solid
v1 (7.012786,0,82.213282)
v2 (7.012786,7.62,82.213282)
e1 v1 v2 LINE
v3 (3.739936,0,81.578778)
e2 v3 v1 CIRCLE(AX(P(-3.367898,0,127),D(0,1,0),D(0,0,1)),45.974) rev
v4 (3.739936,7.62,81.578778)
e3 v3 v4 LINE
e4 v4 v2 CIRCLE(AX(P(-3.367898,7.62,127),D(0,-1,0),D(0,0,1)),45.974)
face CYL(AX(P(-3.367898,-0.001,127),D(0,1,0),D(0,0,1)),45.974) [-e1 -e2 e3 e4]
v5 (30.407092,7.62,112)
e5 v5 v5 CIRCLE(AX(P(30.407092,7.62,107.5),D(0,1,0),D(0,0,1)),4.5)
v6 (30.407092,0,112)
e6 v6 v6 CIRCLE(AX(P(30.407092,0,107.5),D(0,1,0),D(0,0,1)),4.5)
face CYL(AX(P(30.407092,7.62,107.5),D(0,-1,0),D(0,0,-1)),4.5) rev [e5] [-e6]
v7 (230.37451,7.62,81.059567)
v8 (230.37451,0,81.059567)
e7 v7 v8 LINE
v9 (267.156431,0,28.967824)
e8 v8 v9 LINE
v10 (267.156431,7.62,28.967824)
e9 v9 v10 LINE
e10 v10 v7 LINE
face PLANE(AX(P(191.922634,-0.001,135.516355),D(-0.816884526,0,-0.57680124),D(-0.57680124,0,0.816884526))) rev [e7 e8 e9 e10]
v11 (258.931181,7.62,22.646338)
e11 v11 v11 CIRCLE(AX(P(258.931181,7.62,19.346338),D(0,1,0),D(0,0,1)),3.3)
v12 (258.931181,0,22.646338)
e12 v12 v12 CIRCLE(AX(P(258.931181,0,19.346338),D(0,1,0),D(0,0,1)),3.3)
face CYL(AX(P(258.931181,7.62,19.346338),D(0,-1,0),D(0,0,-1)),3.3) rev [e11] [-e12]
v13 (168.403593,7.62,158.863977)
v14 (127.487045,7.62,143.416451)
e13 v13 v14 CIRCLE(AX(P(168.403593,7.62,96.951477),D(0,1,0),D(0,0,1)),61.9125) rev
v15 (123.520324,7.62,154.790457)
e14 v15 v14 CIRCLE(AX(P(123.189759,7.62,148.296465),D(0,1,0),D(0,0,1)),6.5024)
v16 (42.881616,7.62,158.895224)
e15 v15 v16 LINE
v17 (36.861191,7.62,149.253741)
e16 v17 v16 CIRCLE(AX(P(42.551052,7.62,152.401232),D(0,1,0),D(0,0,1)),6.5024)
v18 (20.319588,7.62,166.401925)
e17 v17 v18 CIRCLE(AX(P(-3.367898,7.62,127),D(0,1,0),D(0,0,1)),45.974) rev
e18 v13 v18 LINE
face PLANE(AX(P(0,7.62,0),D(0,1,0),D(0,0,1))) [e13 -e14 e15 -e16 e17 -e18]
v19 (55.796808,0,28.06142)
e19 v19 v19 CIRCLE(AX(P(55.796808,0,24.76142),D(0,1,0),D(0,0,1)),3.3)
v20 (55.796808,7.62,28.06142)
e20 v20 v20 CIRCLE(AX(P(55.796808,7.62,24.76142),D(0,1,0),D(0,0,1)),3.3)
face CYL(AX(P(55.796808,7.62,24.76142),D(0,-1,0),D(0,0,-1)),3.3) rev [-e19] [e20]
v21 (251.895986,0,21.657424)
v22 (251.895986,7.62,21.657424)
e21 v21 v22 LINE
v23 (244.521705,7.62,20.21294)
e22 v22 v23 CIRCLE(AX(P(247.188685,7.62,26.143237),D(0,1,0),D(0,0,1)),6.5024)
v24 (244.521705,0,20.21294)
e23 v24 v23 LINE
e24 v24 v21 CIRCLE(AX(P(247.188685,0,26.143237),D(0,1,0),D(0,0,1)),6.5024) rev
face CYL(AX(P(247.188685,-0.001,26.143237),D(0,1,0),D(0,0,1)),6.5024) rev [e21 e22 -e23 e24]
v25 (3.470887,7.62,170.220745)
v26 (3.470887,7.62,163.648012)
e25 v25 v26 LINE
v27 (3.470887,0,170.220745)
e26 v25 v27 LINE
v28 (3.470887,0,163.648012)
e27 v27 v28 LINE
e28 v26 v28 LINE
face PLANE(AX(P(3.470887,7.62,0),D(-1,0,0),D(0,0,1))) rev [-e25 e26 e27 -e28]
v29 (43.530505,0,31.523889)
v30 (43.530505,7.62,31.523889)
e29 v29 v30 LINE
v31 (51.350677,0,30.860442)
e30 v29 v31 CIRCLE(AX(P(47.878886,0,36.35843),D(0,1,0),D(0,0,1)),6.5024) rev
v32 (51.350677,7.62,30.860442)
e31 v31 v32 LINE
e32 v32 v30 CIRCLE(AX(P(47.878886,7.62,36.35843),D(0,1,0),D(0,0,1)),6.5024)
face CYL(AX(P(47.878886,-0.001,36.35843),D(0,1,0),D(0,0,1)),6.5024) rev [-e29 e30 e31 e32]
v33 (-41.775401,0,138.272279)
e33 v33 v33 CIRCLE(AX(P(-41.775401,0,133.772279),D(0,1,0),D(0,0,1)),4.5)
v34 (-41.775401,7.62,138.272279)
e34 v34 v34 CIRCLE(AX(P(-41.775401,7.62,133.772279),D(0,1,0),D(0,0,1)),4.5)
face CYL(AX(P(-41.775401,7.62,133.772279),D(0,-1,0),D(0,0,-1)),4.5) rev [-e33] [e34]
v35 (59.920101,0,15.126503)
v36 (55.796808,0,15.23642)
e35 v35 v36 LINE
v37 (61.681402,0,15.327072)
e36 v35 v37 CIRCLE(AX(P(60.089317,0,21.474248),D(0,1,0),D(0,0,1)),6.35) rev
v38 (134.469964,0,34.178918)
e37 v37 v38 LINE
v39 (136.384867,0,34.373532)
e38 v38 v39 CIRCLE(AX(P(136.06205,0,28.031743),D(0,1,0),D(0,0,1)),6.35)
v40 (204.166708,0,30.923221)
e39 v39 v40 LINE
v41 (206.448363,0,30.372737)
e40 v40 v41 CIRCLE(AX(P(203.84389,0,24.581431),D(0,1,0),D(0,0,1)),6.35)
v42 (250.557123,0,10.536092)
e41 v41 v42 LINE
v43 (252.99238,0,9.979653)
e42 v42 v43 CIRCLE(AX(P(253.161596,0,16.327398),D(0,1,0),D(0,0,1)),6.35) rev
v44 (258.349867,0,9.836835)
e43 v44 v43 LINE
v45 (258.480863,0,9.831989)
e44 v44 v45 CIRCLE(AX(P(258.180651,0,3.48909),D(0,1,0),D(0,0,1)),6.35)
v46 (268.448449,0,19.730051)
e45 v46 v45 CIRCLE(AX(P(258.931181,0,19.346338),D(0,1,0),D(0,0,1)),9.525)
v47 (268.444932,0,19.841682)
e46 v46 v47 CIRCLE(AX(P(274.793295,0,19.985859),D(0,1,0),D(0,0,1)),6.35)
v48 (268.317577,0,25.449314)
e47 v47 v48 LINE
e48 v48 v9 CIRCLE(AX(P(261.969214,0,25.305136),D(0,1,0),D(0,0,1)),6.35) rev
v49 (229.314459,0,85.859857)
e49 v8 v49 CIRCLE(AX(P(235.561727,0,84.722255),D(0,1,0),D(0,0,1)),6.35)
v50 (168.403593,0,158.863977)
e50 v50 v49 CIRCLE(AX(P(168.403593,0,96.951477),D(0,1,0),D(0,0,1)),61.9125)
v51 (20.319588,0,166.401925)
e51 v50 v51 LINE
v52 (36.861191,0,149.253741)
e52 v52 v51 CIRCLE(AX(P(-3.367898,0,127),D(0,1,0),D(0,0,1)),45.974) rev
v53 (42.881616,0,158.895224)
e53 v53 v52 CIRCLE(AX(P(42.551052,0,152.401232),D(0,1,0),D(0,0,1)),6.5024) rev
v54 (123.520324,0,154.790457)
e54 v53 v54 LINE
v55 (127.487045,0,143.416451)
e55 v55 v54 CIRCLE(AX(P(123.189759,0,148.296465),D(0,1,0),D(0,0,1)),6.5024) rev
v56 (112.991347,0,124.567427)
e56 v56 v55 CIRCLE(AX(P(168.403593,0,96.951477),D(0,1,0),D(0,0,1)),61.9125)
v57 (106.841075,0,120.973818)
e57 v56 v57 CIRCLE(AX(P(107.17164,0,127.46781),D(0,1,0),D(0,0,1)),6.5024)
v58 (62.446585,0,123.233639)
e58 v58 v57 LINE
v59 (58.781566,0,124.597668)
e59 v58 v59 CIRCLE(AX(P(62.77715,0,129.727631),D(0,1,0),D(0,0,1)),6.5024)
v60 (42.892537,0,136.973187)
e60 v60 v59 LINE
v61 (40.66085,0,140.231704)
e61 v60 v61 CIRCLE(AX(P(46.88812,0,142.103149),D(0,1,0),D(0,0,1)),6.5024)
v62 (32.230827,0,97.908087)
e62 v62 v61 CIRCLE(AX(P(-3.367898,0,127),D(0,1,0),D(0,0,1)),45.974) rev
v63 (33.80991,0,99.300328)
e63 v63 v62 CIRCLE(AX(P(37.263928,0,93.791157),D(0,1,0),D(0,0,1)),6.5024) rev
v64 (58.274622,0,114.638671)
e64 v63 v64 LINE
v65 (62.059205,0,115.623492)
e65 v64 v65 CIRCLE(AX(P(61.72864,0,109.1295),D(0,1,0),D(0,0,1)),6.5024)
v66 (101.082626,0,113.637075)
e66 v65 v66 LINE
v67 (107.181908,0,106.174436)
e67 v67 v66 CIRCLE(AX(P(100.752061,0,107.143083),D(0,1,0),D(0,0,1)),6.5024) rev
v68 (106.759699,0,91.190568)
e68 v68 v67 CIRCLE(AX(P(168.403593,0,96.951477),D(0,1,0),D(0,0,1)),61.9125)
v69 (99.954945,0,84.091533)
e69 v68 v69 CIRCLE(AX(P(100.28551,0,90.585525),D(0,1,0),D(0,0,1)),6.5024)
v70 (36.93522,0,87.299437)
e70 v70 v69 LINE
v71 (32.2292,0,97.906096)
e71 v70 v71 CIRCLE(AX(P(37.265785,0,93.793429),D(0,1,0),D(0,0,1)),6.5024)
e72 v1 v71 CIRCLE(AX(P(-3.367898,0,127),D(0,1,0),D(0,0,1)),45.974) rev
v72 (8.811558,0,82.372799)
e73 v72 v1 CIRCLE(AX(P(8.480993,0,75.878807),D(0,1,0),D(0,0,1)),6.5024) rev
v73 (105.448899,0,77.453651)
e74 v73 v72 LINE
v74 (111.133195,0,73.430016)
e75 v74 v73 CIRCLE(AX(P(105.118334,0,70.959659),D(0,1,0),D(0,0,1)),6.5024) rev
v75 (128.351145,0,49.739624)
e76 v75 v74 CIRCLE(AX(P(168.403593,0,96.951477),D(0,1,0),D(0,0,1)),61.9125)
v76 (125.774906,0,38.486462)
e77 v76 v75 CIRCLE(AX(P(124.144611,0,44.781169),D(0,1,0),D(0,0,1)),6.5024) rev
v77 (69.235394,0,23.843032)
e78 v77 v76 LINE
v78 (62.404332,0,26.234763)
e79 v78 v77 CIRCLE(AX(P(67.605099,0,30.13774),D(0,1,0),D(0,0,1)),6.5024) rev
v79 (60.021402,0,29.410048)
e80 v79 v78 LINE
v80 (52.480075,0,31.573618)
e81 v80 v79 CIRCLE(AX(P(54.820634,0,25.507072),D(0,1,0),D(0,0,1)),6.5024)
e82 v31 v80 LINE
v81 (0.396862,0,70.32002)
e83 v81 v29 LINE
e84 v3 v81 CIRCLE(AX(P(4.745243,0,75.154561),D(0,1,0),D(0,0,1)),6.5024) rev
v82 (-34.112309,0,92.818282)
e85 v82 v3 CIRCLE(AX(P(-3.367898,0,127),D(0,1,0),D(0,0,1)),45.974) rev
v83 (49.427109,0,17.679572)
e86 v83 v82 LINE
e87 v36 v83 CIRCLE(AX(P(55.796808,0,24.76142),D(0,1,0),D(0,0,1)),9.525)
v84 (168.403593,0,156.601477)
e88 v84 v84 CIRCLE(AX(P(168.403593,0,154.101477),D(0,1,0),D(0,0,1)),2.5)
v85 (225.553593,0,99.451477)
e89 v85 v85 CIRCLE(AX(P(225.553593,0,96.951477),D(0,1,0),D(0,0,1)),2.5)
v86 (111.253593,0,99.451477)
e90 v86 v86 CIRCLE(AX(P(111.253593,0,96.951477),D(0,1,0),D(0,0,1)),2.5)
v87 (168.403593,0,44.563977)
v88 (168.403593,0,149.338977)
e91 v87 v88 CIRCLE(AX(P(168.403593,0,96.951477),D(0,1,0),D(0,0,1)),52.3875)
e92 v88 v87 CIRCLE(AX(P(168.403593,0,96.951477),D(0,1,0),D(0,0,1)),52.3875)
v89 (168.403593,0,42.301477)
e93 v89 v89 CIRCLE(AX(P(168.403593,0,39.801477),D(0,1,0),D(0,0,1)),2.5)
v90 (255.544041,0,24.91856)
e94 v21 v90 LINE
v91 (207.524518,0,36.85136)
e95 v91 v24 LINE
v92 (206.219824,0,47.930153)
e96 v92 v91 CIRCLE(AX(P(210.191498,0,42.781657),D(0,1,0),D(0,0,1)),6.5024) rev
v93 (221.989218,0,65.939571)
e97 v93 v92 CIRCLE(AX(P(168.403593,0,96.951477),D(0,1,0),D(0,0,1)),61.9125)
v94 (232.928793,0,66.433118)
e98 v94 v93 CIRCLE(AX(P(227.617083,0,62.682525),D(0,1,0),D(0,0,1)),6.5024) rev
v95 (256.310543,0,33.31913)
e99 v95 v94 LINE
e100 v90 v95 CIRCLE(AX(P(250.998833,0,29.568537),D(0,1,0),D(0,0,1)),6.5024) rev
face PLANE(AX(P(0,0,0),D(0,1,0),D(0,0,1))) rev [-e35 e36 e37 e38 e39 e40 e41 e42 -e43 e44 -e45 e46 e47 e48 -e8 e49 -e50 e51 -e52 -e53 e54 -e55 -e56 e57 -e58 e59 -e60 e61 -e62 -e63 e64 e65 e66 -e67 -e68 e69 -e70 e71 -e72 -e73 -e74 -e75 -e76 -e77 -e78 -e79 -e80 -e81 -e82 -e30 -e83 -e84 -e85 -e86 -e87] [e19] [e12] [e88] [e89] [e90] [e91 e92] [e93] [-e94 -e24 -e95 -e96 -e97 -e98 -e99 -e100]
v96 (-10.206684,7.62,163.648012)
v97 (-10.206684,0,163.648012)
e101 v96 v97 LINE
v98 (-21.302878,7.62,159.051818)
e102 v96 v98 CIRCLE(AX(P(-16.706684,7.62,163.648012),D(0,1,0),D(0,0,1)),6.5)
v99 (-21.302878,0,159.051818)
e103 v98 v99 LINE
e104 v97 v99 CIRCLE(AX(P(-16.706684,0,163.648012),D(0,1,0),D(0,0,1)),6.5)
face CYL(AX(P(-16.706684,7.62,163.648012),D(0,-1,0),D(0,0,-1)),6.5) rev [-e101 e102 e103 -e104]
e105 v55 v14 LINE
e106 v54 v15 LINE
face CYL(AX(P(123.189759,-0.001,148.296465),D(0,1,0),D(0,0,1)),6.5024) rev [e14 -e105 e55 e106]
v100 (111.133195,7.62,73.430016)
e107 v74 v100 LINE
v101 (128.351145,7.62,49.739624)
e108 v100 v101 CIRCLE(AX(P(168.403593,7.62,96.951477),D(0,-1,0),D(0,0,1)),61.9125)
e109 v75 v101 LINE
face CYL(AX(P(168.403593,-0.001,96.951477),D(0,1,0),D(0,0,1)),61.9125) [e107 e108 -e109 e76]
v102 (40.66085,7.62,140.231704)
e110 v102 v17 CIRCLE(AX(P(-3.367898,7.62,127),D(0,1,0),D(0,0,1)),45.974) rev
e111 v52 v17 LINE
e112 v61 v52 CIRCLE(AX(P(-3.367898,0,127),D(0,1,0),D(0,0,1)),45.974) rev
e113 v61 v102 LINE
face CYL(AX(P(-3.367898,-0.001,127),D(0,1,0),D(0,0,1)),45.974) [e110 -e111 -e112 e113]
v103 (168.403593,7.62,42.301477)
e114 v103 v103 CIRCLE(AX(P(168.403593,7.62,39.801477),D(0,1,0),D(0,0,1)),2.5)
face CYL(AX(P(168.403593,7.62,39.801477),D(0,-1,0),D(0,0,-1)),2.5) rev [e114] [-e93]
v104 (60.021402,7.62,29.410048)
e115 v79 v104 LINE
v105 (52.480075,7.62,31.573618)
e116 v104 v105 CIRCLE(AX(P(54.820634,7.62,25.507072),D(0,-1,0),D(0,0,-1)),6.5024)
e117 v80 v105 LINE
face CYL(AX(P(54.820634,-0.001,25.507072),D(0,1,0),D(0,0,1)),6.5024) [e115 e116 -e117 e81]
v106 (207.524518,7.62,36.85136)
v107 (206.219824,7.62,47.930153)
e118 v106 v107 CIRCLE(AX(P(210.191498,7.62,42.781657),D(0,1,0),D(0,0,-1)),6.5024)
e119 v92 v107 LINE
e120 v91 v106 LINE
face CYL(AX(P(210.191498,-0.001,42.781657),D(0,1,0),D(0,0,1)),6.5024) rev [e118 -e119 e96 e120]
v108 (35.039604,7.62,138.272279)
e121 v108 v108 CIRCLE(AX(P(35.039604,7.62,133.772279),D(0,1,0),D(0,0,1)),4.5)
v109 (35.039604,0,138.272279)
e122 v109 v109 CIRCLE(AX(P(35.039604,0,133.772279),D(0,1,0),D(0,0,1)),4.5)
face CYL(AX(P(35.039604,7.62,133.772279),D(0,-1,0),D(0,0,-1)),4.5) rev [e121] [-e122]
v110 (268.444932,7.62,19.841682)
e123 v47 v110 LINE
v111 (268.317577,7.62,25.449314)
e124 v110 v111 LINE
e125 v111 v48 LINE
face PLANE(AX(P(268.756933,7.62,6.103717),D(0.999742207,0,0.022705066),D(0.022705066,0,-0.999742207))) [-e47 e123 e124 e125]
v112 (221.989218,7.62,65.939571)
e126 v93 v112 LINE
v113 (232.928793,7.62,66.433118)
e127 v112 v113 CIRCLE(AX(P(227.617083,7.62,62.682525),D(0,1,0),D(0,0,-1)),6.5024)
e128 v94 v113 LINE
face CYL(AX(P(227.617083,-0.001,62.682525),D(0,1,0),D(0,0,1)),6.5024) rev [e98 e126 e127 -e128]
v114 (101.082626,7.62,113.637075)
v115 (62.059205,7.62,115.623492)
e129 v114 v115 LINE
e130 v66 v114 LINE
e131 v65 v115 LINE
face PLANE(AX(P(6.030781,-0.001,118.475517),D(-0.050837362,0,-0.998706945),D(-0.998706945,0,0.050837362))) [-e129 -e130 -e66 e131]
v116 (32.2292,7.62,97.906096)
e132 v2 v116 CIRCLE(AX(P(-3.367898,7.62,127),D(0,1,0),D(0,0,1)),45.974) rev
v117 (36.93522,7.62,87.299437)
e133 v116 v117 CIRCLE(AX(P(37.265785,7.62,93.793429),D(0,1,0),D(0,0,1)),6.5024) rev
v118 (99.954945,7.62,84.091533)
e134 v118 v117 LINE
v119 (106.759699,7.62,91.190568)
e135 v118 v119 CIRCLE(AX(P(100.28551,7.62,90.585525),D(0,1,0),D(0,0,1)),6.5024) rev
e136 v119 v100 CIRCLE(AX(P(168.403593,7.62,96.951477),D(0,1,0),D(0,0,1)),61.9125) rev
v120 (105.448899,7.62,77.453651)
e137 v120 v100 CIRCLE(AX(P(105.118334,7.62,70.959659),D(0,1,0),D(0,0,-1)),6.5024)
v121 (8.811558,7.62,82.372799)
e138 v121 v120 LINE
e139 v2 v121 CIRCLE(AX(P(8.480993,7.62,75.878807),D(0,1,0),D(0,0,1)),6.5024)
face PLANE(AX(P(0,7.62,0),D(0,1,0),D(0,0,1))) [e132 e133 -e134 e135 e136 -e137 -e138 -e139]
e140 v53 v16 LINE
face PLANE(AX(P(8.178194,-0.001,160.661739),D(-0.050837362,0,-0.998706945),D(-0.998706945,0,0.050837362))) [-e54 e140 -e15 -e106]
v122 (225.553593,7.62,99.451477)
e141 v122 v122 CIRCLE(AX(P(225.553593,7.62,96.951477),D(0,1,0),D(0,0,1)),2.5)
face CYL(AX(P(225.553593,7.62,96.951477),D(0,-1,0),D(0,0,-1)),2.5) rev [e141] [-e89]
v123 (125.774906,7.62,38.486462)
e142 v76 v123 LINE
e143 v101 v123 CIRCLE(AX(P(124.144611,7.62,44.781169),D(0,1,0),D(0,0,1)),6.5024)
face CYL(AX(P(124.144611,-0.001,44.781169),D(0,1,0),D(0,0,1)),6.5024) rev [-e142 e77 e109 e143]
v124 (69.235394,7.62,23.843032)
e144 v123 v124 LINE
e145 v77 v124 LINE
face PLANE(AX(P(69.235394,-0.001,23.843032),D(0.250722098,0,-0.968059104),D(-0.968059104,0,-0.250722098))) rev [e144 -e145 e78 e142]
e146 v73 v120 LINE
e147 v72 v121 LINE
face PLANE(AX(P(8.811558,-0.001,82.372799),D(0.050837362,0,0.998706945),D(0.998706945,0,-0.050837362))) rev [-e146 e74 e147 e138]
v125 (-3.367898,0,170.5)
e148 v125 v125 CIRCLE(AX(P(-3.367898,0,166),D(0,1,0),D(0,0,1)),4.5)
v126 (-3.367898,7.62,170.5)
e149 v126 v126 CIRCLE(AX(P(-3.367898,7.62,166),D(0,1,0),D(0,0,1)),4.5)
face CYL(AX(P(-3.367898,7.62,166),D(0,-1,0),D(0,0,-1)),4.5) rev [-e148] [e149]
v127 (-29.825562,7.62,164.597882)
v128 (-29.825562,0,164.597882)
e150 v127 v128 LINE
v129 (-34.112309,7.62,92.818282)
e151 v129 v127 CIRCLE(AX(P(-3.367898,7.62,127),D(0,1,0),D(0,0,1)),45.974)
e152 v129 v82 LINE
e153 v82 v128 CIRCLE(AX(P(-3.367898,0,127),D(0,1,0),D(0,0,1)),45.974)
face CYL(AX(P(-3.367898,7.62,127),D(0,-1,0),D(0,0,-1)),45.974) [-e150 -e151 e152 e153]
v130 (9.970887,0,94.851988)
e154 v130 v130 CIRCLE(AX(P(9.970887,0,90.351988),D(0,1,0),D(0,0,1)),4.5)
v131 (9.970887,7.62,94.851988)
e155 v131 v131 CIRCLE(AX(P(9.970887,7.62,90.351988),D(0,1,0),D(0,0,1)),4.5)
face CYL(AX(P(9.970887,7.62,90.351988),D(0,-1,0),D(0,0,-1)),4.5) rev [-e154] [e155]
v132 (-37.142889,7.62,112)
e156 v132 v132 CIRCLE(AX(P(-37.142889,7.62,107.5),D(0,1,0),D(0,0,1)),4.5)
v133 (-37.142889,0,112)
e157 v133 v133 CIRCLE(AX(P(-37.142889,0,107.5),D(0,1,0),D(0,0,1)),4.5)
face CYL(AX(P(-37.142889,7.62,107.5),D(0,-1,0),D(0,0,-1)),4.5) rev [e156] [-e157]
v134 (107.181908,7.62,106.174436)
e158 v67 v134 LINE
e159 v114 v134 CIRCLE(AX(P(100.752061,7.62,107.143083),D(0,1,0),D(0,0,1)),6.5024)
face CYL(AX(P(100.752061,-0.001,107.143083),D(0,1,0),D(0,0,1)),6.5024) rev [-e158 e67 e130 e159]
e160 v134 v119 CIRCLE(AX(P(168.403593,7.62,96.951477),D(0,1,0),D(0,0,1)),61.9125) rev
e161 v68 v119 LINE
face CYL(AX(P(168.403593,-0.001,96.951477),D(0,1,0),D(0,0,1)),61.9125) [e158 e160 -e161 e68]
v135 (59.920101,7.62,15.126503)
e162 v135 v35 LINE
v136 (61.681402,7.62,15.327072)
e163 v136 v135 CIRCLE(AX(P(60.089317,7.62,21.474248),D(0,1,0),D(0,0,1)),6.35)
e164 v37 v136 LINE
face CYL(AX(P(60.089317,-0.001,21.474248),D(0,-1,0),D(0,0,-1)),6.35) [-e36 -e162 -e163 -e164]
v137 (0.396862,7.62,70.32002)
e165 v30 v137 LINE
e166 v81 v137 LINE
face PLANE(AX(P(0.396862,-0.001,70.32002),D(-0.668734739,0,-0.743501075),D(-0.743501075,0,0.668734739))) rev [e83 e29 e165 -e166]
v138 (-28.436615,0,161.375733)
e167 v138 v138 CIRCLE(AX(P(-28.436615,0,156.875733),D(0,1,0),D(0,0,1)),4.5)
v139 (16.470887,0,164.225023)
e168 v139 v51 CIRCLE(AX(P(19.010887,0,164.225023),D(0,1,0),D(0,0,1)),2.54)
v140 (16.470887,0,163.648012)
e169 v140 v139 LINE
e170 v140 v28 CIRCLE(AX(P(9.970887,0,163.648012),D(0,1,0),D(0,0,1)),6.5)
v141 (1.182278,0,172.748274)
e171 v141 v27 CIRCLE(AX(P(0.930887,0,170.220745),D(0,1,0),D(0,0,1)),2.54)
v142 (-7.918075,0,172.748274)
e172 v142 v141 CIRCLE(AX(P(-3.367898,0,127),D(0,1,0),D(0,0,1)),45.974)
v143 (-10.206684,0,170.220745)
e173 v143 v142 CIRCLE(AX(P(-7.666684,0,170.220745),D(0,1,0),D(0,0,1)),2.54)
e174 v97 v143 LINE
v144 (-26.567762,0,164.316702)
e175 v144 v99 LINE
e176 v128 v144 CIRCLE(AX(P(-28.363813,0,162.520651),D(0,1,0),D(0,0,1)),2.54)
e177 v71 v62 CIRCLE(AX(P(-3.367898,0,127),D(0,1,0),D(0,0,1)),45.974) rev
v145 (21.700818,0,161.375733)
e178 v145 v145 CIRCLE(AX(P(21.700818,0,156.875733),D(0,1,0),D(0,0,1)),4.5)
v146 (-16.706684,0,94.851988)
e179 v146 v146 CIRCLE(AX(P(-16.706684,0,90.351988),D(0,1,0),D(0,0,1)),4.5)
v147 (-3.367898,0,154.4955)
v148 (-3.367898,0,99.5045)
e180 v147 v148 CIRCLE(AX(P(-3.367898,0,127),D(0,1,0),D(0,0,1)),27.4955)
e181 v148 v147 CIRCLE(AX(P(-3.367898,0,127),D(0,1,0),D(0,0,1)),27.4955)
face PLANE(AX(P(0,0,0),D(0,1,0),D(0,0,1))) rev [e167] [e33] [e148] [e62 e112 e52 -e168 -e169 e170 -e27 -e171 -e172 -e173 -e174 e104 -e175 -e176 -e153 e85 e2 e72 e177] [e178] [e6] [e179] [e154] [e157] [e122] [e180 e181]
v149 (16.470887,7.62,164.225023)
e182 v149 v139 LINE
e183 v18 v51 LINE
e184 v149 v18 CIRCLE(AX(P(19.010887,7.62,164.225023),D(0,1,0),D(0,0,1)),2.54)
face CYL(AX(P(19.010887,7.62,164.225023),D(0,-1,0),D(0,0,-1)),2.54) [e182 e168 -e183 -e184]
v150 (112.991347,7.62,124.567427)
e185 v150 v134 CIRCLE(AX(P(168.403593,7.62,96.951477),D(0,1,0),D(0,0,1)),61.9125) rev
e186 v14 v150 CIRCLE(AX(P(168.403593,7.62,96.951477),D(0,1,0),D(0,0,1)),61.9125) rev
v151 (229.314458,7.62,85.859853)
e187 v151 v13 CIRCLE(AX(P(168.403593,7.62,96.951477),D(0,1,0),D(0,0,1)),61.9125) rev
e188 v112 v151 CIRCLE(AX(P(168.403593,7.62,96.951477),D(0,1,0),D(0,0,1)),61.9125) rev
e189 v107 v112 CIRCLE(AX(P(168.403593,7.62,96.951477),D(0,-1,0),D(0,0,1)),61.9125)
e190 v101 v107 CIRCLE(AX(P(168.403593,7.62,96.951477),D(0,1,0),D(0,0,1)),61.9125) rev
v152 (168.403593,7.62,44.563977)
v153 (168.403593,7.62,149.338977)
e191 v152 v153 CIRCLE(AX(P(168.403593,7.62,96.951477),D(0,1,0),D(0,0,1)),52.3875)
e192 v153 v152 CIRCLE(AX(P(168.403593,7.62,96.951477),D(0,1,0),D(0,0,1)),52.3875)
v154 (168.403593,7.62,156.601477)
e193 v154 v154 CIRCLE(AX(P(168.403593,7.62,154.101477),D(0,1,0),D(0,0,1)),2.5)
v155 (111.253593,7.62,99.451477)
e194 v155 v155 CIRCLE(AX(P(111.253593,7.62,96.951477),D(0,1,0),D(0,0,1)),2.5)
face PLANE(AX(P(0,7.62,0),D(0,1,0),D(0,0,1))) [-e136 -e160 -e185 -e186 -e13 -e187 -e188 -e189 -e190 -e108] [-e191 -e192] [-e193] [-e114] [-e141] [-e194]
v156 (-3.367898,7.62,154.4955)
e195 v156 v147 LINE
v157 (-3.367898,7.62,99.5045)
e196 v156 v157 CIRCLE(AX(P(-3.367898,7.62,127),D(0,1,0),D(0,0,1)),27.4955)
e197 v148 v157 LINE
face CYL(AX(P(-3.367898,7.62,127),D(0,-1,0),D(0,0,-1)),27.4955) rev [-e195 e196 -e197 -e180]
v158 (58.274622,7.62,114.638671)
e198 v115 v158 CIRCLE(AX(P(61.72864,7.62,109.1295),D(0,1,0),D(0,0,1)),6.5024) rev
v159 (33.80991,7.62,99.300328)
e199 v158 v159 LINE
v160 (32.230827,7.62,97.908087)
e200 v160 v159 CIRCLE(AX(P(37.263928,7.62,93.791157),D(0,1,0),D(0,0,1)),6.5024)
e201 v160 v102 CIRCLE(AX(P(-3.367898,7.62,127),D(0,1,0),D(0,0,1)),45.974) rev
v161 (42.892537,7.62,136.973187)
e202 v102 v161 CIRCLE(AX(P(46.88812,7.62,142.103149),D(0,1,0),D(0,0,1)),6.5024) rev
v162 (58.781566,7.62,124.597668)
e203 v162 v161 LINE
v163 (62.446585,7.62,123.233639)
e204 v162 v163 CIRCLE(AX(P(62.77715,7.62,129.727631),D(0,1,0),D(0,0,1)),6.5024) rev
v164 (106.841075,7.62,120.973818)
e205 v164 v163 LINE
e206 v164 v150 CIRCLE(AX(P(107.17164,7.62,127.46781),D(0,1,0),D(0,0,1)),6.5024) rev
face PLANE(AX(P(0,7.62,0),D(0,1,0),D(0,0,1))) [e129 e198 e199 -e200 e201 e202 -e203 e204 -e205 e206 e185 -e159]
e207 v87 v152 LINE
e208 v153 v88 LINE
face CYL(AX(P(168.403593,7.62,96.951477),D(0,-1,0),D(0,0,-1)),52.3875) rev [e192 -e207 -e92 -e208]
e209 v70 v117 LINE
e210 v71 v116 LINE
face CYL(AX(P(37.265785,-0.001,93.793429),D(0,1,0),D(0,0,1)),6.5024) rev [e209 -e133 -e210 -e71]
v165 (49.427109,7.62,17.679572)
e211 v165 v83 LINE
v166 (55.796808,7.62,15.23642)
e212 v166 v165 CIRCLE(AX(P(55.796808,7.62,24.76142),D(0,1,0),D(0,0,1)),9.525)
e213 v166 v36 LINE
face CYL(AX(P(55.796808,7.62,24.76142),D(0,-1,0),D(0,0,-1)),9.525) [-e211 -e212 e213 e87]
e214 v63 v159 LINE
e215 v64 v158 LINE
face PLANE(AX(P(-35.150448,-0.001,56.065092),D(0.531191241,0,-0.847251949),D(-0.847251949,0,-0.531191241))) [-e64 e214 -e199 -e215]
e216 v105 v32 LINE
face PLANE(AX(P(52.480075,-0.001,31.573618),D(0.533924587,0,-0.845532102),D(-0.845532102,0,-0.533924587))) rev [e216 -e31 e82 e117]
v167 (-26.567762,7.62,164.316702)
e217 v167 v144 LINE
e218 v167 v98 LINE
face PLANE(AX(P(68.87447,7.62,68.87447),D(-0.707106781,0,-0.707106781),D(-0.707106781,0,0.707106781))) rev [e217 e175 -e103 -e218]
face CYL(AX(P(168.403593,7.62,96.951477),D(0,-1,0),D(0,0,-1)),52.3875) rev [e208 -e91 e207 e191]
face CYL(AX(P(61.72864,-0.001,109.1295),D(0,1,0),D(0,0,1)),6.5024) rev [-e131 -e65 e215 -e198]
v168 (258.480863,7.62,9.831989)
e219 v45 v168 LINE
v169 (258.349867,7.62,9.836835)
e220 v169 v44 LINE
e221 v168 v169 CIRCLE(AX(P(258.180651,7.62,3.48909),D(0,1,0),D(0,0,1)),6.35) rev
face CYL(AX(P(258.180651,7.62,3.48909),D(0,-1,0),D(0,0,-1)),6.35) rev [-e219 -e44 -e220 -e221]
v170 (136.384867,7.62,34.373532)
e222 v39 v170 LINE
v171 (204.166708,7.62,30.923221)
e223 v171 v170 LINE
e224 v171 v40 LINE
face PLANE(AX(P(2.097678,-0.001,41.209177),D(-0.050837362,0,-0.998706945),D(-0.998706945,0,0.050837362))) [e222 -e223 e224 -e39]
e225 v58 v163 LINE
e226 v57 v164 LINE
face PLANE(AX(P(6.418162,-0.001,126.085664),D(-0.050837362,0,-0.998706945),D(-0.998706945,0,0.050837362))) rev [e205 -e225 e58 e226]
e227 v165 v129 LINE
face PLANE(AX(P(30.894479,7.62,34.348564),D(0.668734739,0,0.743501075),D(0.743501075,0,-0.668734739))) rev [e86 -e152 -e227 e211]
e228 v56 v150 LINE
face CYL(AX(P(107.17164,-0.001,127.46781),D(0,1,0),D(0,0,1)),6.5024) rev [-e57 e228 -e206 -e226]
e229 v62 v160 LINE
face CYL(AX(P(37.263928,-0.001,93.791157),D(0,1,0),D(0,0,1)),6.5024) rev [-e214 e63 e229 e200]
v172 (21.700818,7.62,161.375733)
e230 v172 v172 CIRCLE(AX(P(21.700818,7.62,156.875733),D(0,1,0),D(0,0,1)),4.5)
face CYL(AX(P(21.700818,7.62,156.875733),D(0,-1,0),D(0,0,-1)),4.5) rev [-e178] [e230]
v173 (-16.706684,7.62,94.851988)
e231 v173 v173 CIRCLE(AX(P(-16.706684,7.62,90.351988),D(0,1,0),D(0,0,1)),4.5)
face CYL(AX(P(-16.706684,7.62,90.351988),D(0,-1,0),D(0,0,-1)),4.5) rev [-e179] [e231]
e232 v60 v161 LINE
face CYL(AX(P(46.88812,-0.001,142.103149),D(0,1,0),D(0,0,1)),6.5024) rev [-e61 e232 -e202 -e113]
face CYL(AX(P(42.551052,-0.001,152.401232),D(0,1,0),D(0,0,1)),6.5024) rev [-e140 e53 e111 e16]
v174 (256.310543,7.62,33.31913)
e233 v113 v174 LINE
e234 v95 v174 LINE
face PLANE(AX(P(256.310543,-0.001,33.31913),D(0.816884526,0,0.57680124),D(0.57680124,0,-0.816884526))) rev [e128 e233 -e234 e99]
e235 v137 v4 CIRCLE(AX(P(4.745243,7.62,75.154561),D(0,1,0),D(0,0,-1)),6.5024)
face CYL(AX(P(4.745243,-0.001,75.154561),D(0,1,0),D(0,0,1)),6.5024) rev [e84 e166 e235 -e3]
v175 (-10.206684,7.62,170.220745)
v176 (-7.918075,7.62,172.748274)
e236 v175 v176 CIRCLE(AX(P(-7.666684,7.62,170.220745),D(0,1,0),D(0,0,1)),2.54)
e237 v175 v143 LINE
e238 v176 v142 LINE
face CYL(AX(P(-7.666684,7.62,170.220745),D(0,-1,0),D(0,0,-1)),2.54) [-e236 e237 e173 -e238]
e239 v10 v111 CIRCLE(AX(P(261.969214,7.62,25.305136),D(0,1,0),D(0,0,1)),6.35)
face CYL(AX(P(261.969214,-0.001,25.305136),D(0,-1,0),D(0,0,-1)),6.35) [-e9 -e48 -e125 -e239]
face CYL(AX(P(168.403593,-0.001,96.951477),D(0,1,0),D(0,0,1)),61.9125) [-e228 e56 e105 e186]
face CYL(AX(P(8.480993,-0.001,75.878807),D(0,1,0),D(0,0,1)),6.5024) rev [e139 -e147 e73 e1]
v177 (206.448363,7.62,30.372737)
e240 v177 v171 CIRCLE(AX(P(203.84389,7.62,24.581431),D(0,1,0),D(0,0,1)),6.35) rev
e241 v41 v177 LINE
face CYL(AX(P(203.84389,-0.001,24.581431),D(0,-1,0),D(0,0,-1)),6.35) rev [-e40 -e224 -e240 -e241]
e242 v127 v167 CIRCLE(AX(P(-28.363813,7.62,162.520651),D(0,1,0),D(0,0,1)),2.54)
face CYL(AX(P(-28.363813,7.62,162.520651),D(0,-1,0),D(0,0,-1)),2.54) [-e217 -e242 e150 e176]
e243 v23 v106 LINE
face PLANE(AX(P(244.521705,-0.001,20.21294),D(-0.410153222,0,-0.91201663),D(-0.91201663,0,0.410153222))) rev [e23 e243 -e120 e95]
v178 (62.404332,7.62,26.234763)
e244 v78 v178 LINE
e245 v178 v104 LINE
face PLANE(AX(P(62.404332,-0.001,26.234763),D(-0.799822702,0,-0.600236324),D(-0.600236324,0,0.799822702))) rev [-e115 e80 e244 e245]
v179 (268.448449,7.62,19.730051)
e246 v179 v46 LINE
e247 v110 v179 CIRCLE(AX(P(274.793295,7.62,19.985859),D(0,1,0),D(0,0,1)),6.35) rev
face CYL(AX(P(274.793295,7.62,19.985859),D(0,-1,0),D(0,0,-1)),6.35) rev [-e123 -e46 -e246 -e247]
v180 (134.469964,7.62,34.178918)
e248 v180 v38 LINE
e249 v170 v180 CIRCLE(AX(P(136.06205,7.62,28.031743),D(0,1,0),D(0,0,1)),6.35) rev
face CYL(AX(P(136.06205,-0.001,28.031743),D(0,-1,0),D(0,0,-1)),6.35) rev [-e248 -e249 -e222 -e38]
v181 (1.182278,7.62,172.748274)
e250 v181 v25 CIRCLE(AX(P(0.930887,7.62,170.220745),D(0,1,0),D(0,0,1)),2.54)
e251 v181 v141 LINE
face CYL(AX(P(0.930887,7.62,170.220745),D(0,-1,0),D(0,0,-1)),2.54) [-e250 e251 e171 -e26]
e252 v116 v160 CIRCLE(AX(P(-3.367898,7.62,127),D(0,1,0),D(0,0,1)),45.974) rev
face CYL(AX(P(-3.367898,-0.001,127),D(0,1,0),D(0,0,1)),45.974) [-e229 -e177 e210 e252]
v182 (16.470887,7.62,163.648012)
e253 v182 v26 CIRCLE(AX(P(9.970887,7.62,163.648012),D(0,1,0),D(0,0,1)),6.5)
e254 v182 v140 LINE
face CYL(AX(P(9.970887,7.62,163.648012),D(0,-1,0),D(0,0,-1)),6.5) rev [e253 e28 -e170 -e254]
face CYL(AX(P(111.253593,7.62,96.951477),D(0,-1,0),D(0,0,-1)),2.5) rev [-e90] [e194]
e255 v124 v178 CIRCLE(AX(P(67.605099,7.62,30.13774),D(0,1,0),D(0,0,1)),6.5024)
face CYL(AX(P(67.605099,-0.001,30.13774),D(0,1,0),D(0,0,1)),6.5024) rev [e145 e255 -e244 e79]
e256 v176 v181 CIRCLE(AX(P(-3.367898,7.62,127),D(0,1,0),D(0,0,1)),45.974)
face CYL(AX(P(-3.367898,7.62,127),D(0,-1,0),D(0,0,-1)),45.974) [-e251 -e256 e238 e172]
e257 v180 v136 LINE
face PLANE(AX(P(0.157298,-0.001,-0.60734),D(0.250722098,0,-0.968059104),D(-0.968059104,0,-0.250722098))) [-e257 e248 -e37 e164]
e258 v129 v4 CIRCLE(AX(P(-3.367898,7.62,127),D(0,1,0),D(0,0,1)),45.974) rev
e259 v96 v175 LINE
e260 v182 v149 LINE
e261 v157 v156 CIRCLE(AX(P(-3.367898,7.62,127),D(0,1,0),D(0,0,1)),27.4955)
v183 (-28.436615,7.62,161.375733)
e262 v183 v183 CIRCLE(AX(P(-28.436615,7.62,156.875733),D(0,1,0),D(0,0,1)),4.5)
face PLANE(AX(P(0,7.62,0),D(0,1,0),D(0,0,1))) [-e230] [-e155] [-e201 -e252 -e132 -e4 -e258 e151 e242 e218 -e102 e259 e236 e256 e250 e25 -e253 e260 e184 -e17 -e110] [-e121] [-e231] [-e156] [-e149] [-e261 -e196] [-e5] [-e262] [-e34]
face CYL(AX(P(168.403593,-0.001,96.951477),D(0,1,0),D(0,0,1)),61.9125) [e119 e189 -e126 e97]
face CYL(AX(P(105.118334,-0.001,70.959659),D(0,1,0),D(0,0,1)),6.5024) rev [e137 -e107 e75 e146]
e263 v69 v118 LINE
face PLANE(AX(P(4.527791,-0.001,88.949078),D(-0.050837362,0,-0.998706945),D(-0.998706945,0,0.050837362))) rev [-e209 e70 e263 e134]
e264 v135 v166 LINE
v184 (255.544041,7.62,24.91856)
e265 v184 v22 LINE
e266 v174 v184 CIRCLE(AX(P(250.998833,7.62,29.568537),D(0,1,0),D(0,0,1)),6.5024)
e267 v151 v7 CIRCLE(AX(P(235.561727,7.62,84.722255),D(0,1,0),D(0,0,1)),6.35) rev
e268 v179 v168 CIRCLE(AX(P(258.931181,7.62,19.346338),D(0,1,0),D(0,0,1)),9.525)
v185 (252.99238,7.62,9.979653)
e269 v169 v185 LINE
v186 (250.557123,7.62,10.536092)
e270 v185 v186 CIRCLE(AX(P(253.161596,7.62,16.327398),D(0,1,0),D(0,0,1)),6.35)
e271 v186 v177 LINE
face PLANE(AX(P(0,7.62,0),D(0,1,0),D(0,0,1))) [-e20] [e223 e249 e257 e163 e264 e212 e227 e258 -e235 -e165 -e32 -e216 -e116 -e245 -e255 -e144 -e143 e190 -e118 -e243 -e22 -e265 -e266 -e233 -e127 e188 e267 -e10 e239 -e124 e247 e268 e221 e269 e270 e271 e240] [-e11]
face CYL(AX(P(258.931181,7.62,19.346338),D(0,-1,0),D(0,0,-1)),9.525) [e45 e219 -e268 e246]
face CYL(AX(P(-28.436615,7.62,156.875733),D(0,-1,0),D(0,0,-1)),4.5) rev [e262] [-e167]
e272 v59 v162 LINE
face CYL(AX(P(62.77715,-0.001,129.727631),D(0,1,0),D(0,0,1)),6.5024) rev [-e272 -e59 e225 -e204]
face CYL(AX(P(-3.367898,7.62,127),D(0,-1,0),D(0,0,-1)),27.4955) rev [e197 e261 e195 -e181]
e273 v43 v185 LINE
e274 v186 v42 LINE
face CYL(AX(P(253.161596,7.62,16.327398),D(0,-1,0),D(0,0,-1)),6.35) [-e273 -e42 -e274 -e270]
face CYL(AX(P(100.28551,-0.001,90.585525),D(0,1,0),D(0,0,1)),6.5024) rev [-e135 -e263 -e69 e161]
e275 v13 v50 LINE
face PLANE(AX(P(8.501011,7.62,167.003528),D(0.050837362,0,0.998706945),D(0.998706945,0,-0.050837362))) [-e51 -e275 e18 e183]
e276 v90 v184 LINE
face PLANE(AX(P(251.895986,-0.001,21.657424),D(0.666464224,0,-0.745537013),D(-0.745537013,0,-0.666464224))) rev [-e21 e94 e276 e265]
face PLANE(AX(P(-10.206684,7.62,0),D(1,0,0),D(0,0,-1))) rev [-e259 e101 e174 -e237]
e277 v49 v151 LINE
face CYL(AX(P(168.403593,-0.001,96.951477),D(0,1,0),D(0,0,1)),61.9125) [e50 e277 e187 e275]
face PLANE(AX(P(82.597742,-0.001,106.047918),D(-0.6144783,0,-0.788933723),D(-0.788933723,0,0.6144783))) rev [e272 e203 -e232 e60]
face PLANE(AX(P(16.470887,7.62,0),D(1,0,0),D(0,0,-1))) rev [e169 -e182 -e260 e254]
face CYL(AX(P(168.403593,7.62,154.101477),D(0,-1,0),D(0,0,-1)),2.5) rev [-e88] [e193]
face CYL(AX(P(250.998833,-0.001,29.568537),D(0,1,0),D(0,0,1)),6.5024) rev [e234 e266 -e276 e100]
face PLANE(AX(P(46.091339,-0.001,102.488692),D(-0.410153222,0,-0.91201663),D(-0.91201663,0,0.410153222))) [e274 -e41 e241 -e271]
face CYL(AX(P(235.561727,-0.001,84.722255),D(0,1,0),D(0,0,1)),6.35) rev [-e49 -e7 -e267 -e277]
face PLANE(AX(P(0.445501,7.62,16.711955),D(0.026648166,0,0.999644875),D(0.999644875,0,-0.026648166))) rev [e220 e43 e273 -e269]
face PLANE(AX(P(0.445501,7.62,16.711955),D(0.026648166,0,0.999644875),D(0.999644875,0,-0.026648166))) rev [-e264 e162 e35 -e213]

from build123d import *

# Parameters (mm, degrees)
SKETCH3_R           = 2.5
SKETCH3_R_2         = 52.3875
SKETCH3_R_3         = 3.3
SKETCH3_R_4         = 4.5
SKETCH3_R_5         = 27.4955
SKETCH3_R_6         = 3.300000004
BOSS_EXTRUDE1_DEPTH = 7.62
CUT_EXTRUDE3_REACH  = 321.448
CUT_EXTRUDE4_REACH  = 321.448
FILLET1_R           = 6.35
CUT_EXTRUDE10_REACH = 321.448
CUT_EXTRUDE12_REACH = 321.448
CUT_EXTRUDE15_START = -7.62
CUT_EXTRUDE15_DEPTH = 7.62


# Read off the part's stored shape, not the designer's step: Cut-Extrude15
with BuildPart() as part:
    # Sketch3 → Boss-Extrude1 (new body)
    with BuildSketch(Plane(origin=(0, 0, 0), x_dir=(-1, 0, 0), z_dir=(0, 1, 0))):
        with BuildLine():
            Line((-49.427109136, 17.679572239), (34.112309331, 92.818281558))
            ThreePointArc((34.112309331, 92.818281558), (49.260131818, 129.740728466), (29.825562347, 164.597881552))
            ThreePointArc((29.825562347, 164.597881552), (28.145398332, 165.051242365), (26.567761736, 164.316701751))
            Line((26.567761736, 164.316701751), (21.302878118, 159.051818133))
            ThreePointArc((21.302878118, 159.051818133), (14.21924173, 157.642795249), (10.20668404, 163.648012211))
            Line((10.20668404, 163.648012211), (10.20668404, 170.220745001))
            ThreePointArc((10.20668404, 170.220745001), (9.549518747, 171.925600851), (7.91807501, 172.748273949))
            ThreePointArc((7.91807501, 172.748273949), (3.367898451, 172.974), (-1.182278109, 172.748273949))
            ThreePointArc((-1.182278109, 172.748273949), (-2.813721846, 171.925600851), (-3.470887139, 170.220745001))
            Line((-3.470887139, 170.220745001), (-3.470887139, 163.648012211))
            ThreePointArc((-3.470887139, 163.648012211), (-9.970887139, 157.148012211), (-16.470887139, 163.648012211))
            Line((-16.470887139, 163.648012211), (-16.470887139, 164.225022653))
            ThreePointArc((-16.470887139, 164.225022653), (-17.760387302, 166.435870942), (-20.319588051, 166.401924563))
            Line((-20.319588051, 166.401924563), (-168.403592651, 158.863977372))
            Line((-168.403592651, 158.863977372), (-265.178957518, 163.648012211))
            Line((-265.178957518, 163.648012211), (-268.446360693, 19.778758396))
            ThreePointArc((-268.446360693, 19.778758396), (-265.639755471, 12.584633122), (-258.423714062, 9.834866275))
            Line((-258.423714062, 9.834866275), (-55.796807523, 15.236419982))
            ThreePointArc((-55.796807523, 15.236419982), (-52.385720802, 15.868157792), (-49.427109136, 17.679572239))
        make_face()
        with Locations(Location((-168.403592651, 39.801477371, 0), (0, 0, 90))):
            Circle(SKETCH3_R, mode=Mode.SUBTRACT)
        with Locations(Location((-225.553592651, 96.951477371, 0), (0, 0, 90))):
            Circle(SKETCH3_R, mode=Mode.SUBTRACT)
        with Locations(Location((-168.403592651, 96.951477372, 0), (0, 0, 90))):
            Circle(SKETCH3_R_2, mode=Mode.SUBTRACT)
        with Locations(Location((-111.253592651, 96.951477371, 0), (0, 0, 90))):
            Circle(SKETCH3_R, mode=Mode.SUBTRACT)
        with Locations(Location((-168.403592651, 154.101477371, 0), (0, 0, 90))):
            Circle(SKETCH3_R, mode=Mode.SUBTRACT)
        with Locations(Location((-55.796807523, 24.761419982, 0), (0, 0, 90))):
            Circle(SKETCH3_R_3, mode=Mode.SUBTRACT)
        with Locations(Location((28.436615228, 156.875733282, 0), (0, 0, 90))):
            Circle(SKETCH3_R_4, mode=Mode.SUBTRACT)
        with Locations(Location((-9.970887139, 90.351987789, 0), (0, 0, 90))):
            Circle(SKETCH3_R_4, mode=Mode.SUBTRACT)
        with Locations(Location((16.70668404, 90.351987789, 0), (0, 0, 90))):
            Circle(SKETCH3_R_4, mode=Mode.SUBTRACT)
        with Locations(Location((-30.407092297, 107.5, 0), (0, 0, 90))):
            Circle(SKETCH3_R_4, mode=Mode.SUBTRACT)
        with Locations(Location((37.142889198, 107.5, 0), (0, 0, 90))):
            Circle(SKETCH3_R_4, mode=Mode.SUBTRACT)
        with Locations(Location((3.367898451, 127, 0), (0, 0, 90))):
            Circle(SKETCH3_R_5, mode=Mode.SUBTRACT)
        with Locations(Location((-35.039603917, 133.772278929, 0), (0, 0, 90))):
            Circle(SKETCH3_R_4, mode=Mode.SUBTRACT)
        with Locations(Location((41.775400818, 133.772278929, 0), (0, 0, 90))):
            Circle(SKETCH3_R_4, mode=Mode.SUBTRACT)
        with Locations(Location((-21.700818327, 156.875733282, 0), (0, 0, 90))):
            Circle(SKETCH3_R_4, mode=Mode.SUBTRACT)
        with Locations(Location((3.367898451, 166, 0), (0, 0, 90))):
            Circle(SKETCH3_R_4, mode=Mode.SUBTRACT)
        with Locations(Location((-258.931181349, 19.346338398, 0), (0, 0, 90))):
            Circle(SKETCH3_R_6, mode=Mode.SUBTRACT)
    extrude(amount=BOSS_EXTRUDE1_DEPTH)

    # Sketch12 → Cut-Extrude3 (cut, up to next)
    with BuildSketch(Plane(origin=(0, 7.62, 0), x_dir=(1, 0, 0), z_dir=(0, 1, 0)), mode=Mode.PRIVATE) as cut_extrude3_sk1:
        with BuildLine():
            Line((265.178957518, -163.648012211), (267.97556459, -40.508702148))
            Line((267.97556459, -40.508702148), (230.316092651, -96.951477372))
            ThreePointArc((230.316092651, -96.951477372), (212.182341242, -140.730225962), (168.403592651, -158.863977372))
            Line((168.403592651, -158.863977372), (265.178957518, -163.648012211))
        make_face()
    cut_extrude3_tool1 = extrude(cut_extrude3_sk1.sketch, amount=-CUT_EXTRUDE3_REACH, mode=Mode.PRIVATE) & part.part
    # Sketch12 → Cut-Extrude3 (cut, up to next)
    with BuildSketch(Plane(origin=(0, 7.62, 0), x_dir=(1, 0, 0), z_dir=(0, 1, 0)), mode=Mode.PRIVATE) as cut_extrude3_sk2:
        with BuildLine():
            Line((267.97556459, -40.508702148), (268.273601144, -27.385651725))
            Line((268.273601144, -27.385651725), (228.792351717, -83.300271022))
            ThreePointArc((228.792351717, -83.300271022), (229.933978242, -90.083486013), (230.316092651, -96.951477372))
            Line((230.316092651, -96.951477372), (267.97556459, -40.508702148))
        make_face()
    cut_extrude3_tool2 = extrude(cut_extrude3_sk2.sketch, amount=-CUT_EXTRUDE3_REACH, mode=Mode.PRIVATE) & part.part
    add(cut_extrude3_tool1.solids().sort_by_distance((242.898488, 7.62, 120.934583))[0], mode=Mode.SUBTRACT)
    add(cut_extrude3_tool2.solids().sort_by_distance((248.238841, 7.62, 62.857625))[0], mode=Mode.SUBTRACT)

    # Sketch13 → Cut-Extrude4 (cut, up to next)
    with BuildSketch(Plane(origin=(0, 7.62, 0), x_dir=(1, 0, 0), z_dir=(0, 1, 0)), mode=Mode.PRIVATE) as cut_extrude4_sk1:
        Polygon((205.359295361, -30.862514021), (251.718937312, -10.013599753), (60.814888047, -15.102649833), (135.412495886, -34.423028757), align=None)
    cut_extrude4_tool1 = extrude(cut_extrude4_sk1.sketch, amount=-CUT_EXTRUDE4_REACH, mode=Mode.PRIVATE) & part.part
    add(cut_extrude4_tool1.solids().sort_by_distance((160.937928, 7.62, 21.113641))[0], mode=Mode.SUBTRACT)

    # Fillet1
    fillet1_edges = [part.edges().sort_by_distance(p)[0] for p in [
        (268.273601144, 3.81, 27.385651725),
        (228.792351717, 3.81, 83.300271022),
        (205.359295361, 3.81, 30.862514021),
        (135.412495886, 3.81, 34.423028757),
        (60.814888047, 3.81, 15.102649833),
        (251.718937312, 3.81, 10.013599753),
        (258.423714062, 3.81, 9.834866275),
        (268.446360693, 3.81, 19.778758396),
    ]]
    fillet(fillet1_edges, radius=FILLET1_R)

    # Sketch14 → Cut-Extrude10 (cut, up to next)
    with BuildSketch(Plane(origin=(0, 7.62, 0), x_dir=(1, 0, 0), z_dir=(0, 1, 0)), mode=Mode.PRIVATE) as cut_extrude10_sk1:
        with BuildLine():
            Line((244.52170499, -20.212940115), (207.524518121, -36.851359757))
            ThreePointArc((207.524518121, -36.851359757), (203.733724344, -42.021157152), (206.219824449, -47.930152738))
            ThreePointArc((206.219824449, -47.930152738), (214.983198468, -56.165475138), (221.98921849, -65.939570631))
            ThreePointArc((221.98921849, -65.939570631), (227.324020713, -69.178317741), (232.928793139, -66.433117629))
            Line((232.928793139, -66.433117629), (256.310542684, -33.319129513))
            ThreePointArc((256.310542684, -33.319129513), (257.474332837, -28.977686692), (255.544041259, -24.91856022))
            Line((255.544041259, -24.91856022), (251.895986311, -21.657423526))
            ThreePointArc((251.895986311, -21.657423526), (248.438629388, -19.762105057), (244.52170499, -20.212940115))
        make_face()
    cut_extrude10_tool1 = extrude(cut_extrude10_sk1.sketch, amount=-CUT_EXTRUDE10_REACH, mode=Mode.PRIVATE) & part.part
    add(cut_extrude10_tool1.solids().sort_by_distance((231.191654, 7.62, 42.620708))[0], mode=Mode.SUBTRACT)

    # Sketch19 → Cut-Extrude12 (cut, up to next)
    with BuildSketch(Plane(origin=(0, 7.62, 0), x_dir=(1, 0, 0), z_dir=(0, 1, 0)), mode=Mode.PRIVATE) as cut_extrude12_sk1:
        with BuildLine():
            Line((69.235394101, -23.843032422), (125.774906007, -38.486461693))
            ThreePointArc((125.774906007, -38.486461693), (130.483030138, -43.330085475), (128.351144664, -49.739624343))
            ThreePointArc((128.351144664, -49.739624343), (118.321232933, -60.552096865), (111.133194535, -73.43001577))
            ThreePointArc((111.133194535, -73.43001577), (108.875130187, -76.266983385), (105.448899127, -77.453651229))
            Line((105.448899127, -77.453651229), (8.811557915, -82.372799497))
            ThreePointArc((8.811557915, -82.372799497), (7.906607304, -82.355788757), (7.012785778, -82.213282427))
            ThreePointArc((7.012785778, -82.213282427), (5.382114006, -81.866354479), (3.739935744, -81.578778428))
            ThreePointArc((3.739935744, -81.578778428), (-1.488167541, -77.00545388), (0.396861915, -70.320020062))
            Line((0.396861915, -70.320020062), (43.530504975, -31.52388852))
            ThreePointArc((43.530504975, -31.52388852), (47.329210716, -29.879304731), (51.350676973, -30.860441973))
            Line((51.350676973, -30.860441973), (52.480075426, -31.573618446))
            ThreePointArc((52.480075426, -31.573618446), (56.613803862, -31.757331678), (60.021401634, -29.410048407))
            Line((60.021401634, -29.410048407), (62.404331593, -26.234763269))
            ThreePointArc((62.404331593, -26.234763269), (65.456340654, -24.000636026), (69.235394101, -23.843032422))
        make_face()
    cut_extrude12_tool1 = extrude(cut_extrude12_sk1.sketch, amount=-CUT_EXTRUDE12_REACH, mode=Mode.PRIVATE) & part.part
    add(cut_extrude12_tool1.solids().sort_by_distance((66.631089, 7.62, 56.211545))[0], mode=Mode.SUBTRACT)

    # Cut-Extrude15 outline → Cut-Extrude15 (cut)
    with BuildSketch(Plane(origin=(0, 7.62, 0), x_dir=(1, 0, 0), z_dir=(0, 1, 0)).offset(CUT_EXTRUDE15_START)):
        with BuildLine():
            ThreePointArc((40.660849974, -140.231703904), (39.001844492, -144.844146352), (36.861191377, -149.253741431))
            ThreePointArc((36.861191377, -149.253741431), (37.035613438, -155.845233628), (42.881616461, -158.895223973))
            Line((42.881616461, -158.895223973), (123.520323562, -154.790457105))
            ThreePointArc((123.520323562, -154.790457105), (129.329486204, -150.437715141), (127.48704531, -143.416451383))
            ThreePointArc((127.48704531, -143.416451383), (119.32579193, -134.694385747), (112.991346909, -124.567427074))
            ThreePointArc((112.991346909, -124.567427074), (110.452063443, -121.853539717), (106.841075413, -120.973817853))
            Line((106.841075413, -120.973817853), (62.446585261, -123.233638711))
            ThreePointArc((62.446585261, -123.233638711), (60.509103742, -123.633603237), (58.781566428, -124.597668114))
            Line((58.781566428, -124.597668114), (42.892536771, -136.97318668))
            ThreePointArc((42.892536771, -136.97318668), (41.523311936, -138.428909918), (40.660849974, -140.231703904))
        make_face()
        with BuildLine():
            ThreePointArc((32.229200226, -97.90609614), (32.230013577, -97.907091323), (32.2308269, -97.908086529))
            ThreePointArc((32.2308269, -97.908086529), (32.963651262, -98.668536238), (33.809910067, -99.300328325))
            Line((33.809910067, -99.300328325), (58.274621766, -114.638670821))
            ThreePointArc((58.274621766, -114.638670821), (60.09112394, -115.422332807), (62.059204559, -115.623491788))
            Line((62.059204559, -115.623491788), (101.082626056, -113.637075421))
            ThreePointArc((101.082626056, -113.637075421), (105.786794259, -111.258015784), (107.181907879, -106.174436215))
            ThreePointArc((107.181907879, -106.174436215), (106.515656468, -98.695326918), (106.759699387, -91.190567769))
            ThreePointArc((106.759699387, -91.190567769), (104.979666567, -86.085957931), (99.954945116, -84.091532504))
            Line((99.954945116, -84.091532504), (36.935219874, -87.299437113))
            ThreePointArc((36.935219874, -87.299437113), (31.322143272, -91.156322431), (32.229200226, -97.90609614))
        make_face()
    extrude(amount=CUT_EXTRUDE15_DEPTH, mode=Mode.SUBTRACT)


solid = part.part
